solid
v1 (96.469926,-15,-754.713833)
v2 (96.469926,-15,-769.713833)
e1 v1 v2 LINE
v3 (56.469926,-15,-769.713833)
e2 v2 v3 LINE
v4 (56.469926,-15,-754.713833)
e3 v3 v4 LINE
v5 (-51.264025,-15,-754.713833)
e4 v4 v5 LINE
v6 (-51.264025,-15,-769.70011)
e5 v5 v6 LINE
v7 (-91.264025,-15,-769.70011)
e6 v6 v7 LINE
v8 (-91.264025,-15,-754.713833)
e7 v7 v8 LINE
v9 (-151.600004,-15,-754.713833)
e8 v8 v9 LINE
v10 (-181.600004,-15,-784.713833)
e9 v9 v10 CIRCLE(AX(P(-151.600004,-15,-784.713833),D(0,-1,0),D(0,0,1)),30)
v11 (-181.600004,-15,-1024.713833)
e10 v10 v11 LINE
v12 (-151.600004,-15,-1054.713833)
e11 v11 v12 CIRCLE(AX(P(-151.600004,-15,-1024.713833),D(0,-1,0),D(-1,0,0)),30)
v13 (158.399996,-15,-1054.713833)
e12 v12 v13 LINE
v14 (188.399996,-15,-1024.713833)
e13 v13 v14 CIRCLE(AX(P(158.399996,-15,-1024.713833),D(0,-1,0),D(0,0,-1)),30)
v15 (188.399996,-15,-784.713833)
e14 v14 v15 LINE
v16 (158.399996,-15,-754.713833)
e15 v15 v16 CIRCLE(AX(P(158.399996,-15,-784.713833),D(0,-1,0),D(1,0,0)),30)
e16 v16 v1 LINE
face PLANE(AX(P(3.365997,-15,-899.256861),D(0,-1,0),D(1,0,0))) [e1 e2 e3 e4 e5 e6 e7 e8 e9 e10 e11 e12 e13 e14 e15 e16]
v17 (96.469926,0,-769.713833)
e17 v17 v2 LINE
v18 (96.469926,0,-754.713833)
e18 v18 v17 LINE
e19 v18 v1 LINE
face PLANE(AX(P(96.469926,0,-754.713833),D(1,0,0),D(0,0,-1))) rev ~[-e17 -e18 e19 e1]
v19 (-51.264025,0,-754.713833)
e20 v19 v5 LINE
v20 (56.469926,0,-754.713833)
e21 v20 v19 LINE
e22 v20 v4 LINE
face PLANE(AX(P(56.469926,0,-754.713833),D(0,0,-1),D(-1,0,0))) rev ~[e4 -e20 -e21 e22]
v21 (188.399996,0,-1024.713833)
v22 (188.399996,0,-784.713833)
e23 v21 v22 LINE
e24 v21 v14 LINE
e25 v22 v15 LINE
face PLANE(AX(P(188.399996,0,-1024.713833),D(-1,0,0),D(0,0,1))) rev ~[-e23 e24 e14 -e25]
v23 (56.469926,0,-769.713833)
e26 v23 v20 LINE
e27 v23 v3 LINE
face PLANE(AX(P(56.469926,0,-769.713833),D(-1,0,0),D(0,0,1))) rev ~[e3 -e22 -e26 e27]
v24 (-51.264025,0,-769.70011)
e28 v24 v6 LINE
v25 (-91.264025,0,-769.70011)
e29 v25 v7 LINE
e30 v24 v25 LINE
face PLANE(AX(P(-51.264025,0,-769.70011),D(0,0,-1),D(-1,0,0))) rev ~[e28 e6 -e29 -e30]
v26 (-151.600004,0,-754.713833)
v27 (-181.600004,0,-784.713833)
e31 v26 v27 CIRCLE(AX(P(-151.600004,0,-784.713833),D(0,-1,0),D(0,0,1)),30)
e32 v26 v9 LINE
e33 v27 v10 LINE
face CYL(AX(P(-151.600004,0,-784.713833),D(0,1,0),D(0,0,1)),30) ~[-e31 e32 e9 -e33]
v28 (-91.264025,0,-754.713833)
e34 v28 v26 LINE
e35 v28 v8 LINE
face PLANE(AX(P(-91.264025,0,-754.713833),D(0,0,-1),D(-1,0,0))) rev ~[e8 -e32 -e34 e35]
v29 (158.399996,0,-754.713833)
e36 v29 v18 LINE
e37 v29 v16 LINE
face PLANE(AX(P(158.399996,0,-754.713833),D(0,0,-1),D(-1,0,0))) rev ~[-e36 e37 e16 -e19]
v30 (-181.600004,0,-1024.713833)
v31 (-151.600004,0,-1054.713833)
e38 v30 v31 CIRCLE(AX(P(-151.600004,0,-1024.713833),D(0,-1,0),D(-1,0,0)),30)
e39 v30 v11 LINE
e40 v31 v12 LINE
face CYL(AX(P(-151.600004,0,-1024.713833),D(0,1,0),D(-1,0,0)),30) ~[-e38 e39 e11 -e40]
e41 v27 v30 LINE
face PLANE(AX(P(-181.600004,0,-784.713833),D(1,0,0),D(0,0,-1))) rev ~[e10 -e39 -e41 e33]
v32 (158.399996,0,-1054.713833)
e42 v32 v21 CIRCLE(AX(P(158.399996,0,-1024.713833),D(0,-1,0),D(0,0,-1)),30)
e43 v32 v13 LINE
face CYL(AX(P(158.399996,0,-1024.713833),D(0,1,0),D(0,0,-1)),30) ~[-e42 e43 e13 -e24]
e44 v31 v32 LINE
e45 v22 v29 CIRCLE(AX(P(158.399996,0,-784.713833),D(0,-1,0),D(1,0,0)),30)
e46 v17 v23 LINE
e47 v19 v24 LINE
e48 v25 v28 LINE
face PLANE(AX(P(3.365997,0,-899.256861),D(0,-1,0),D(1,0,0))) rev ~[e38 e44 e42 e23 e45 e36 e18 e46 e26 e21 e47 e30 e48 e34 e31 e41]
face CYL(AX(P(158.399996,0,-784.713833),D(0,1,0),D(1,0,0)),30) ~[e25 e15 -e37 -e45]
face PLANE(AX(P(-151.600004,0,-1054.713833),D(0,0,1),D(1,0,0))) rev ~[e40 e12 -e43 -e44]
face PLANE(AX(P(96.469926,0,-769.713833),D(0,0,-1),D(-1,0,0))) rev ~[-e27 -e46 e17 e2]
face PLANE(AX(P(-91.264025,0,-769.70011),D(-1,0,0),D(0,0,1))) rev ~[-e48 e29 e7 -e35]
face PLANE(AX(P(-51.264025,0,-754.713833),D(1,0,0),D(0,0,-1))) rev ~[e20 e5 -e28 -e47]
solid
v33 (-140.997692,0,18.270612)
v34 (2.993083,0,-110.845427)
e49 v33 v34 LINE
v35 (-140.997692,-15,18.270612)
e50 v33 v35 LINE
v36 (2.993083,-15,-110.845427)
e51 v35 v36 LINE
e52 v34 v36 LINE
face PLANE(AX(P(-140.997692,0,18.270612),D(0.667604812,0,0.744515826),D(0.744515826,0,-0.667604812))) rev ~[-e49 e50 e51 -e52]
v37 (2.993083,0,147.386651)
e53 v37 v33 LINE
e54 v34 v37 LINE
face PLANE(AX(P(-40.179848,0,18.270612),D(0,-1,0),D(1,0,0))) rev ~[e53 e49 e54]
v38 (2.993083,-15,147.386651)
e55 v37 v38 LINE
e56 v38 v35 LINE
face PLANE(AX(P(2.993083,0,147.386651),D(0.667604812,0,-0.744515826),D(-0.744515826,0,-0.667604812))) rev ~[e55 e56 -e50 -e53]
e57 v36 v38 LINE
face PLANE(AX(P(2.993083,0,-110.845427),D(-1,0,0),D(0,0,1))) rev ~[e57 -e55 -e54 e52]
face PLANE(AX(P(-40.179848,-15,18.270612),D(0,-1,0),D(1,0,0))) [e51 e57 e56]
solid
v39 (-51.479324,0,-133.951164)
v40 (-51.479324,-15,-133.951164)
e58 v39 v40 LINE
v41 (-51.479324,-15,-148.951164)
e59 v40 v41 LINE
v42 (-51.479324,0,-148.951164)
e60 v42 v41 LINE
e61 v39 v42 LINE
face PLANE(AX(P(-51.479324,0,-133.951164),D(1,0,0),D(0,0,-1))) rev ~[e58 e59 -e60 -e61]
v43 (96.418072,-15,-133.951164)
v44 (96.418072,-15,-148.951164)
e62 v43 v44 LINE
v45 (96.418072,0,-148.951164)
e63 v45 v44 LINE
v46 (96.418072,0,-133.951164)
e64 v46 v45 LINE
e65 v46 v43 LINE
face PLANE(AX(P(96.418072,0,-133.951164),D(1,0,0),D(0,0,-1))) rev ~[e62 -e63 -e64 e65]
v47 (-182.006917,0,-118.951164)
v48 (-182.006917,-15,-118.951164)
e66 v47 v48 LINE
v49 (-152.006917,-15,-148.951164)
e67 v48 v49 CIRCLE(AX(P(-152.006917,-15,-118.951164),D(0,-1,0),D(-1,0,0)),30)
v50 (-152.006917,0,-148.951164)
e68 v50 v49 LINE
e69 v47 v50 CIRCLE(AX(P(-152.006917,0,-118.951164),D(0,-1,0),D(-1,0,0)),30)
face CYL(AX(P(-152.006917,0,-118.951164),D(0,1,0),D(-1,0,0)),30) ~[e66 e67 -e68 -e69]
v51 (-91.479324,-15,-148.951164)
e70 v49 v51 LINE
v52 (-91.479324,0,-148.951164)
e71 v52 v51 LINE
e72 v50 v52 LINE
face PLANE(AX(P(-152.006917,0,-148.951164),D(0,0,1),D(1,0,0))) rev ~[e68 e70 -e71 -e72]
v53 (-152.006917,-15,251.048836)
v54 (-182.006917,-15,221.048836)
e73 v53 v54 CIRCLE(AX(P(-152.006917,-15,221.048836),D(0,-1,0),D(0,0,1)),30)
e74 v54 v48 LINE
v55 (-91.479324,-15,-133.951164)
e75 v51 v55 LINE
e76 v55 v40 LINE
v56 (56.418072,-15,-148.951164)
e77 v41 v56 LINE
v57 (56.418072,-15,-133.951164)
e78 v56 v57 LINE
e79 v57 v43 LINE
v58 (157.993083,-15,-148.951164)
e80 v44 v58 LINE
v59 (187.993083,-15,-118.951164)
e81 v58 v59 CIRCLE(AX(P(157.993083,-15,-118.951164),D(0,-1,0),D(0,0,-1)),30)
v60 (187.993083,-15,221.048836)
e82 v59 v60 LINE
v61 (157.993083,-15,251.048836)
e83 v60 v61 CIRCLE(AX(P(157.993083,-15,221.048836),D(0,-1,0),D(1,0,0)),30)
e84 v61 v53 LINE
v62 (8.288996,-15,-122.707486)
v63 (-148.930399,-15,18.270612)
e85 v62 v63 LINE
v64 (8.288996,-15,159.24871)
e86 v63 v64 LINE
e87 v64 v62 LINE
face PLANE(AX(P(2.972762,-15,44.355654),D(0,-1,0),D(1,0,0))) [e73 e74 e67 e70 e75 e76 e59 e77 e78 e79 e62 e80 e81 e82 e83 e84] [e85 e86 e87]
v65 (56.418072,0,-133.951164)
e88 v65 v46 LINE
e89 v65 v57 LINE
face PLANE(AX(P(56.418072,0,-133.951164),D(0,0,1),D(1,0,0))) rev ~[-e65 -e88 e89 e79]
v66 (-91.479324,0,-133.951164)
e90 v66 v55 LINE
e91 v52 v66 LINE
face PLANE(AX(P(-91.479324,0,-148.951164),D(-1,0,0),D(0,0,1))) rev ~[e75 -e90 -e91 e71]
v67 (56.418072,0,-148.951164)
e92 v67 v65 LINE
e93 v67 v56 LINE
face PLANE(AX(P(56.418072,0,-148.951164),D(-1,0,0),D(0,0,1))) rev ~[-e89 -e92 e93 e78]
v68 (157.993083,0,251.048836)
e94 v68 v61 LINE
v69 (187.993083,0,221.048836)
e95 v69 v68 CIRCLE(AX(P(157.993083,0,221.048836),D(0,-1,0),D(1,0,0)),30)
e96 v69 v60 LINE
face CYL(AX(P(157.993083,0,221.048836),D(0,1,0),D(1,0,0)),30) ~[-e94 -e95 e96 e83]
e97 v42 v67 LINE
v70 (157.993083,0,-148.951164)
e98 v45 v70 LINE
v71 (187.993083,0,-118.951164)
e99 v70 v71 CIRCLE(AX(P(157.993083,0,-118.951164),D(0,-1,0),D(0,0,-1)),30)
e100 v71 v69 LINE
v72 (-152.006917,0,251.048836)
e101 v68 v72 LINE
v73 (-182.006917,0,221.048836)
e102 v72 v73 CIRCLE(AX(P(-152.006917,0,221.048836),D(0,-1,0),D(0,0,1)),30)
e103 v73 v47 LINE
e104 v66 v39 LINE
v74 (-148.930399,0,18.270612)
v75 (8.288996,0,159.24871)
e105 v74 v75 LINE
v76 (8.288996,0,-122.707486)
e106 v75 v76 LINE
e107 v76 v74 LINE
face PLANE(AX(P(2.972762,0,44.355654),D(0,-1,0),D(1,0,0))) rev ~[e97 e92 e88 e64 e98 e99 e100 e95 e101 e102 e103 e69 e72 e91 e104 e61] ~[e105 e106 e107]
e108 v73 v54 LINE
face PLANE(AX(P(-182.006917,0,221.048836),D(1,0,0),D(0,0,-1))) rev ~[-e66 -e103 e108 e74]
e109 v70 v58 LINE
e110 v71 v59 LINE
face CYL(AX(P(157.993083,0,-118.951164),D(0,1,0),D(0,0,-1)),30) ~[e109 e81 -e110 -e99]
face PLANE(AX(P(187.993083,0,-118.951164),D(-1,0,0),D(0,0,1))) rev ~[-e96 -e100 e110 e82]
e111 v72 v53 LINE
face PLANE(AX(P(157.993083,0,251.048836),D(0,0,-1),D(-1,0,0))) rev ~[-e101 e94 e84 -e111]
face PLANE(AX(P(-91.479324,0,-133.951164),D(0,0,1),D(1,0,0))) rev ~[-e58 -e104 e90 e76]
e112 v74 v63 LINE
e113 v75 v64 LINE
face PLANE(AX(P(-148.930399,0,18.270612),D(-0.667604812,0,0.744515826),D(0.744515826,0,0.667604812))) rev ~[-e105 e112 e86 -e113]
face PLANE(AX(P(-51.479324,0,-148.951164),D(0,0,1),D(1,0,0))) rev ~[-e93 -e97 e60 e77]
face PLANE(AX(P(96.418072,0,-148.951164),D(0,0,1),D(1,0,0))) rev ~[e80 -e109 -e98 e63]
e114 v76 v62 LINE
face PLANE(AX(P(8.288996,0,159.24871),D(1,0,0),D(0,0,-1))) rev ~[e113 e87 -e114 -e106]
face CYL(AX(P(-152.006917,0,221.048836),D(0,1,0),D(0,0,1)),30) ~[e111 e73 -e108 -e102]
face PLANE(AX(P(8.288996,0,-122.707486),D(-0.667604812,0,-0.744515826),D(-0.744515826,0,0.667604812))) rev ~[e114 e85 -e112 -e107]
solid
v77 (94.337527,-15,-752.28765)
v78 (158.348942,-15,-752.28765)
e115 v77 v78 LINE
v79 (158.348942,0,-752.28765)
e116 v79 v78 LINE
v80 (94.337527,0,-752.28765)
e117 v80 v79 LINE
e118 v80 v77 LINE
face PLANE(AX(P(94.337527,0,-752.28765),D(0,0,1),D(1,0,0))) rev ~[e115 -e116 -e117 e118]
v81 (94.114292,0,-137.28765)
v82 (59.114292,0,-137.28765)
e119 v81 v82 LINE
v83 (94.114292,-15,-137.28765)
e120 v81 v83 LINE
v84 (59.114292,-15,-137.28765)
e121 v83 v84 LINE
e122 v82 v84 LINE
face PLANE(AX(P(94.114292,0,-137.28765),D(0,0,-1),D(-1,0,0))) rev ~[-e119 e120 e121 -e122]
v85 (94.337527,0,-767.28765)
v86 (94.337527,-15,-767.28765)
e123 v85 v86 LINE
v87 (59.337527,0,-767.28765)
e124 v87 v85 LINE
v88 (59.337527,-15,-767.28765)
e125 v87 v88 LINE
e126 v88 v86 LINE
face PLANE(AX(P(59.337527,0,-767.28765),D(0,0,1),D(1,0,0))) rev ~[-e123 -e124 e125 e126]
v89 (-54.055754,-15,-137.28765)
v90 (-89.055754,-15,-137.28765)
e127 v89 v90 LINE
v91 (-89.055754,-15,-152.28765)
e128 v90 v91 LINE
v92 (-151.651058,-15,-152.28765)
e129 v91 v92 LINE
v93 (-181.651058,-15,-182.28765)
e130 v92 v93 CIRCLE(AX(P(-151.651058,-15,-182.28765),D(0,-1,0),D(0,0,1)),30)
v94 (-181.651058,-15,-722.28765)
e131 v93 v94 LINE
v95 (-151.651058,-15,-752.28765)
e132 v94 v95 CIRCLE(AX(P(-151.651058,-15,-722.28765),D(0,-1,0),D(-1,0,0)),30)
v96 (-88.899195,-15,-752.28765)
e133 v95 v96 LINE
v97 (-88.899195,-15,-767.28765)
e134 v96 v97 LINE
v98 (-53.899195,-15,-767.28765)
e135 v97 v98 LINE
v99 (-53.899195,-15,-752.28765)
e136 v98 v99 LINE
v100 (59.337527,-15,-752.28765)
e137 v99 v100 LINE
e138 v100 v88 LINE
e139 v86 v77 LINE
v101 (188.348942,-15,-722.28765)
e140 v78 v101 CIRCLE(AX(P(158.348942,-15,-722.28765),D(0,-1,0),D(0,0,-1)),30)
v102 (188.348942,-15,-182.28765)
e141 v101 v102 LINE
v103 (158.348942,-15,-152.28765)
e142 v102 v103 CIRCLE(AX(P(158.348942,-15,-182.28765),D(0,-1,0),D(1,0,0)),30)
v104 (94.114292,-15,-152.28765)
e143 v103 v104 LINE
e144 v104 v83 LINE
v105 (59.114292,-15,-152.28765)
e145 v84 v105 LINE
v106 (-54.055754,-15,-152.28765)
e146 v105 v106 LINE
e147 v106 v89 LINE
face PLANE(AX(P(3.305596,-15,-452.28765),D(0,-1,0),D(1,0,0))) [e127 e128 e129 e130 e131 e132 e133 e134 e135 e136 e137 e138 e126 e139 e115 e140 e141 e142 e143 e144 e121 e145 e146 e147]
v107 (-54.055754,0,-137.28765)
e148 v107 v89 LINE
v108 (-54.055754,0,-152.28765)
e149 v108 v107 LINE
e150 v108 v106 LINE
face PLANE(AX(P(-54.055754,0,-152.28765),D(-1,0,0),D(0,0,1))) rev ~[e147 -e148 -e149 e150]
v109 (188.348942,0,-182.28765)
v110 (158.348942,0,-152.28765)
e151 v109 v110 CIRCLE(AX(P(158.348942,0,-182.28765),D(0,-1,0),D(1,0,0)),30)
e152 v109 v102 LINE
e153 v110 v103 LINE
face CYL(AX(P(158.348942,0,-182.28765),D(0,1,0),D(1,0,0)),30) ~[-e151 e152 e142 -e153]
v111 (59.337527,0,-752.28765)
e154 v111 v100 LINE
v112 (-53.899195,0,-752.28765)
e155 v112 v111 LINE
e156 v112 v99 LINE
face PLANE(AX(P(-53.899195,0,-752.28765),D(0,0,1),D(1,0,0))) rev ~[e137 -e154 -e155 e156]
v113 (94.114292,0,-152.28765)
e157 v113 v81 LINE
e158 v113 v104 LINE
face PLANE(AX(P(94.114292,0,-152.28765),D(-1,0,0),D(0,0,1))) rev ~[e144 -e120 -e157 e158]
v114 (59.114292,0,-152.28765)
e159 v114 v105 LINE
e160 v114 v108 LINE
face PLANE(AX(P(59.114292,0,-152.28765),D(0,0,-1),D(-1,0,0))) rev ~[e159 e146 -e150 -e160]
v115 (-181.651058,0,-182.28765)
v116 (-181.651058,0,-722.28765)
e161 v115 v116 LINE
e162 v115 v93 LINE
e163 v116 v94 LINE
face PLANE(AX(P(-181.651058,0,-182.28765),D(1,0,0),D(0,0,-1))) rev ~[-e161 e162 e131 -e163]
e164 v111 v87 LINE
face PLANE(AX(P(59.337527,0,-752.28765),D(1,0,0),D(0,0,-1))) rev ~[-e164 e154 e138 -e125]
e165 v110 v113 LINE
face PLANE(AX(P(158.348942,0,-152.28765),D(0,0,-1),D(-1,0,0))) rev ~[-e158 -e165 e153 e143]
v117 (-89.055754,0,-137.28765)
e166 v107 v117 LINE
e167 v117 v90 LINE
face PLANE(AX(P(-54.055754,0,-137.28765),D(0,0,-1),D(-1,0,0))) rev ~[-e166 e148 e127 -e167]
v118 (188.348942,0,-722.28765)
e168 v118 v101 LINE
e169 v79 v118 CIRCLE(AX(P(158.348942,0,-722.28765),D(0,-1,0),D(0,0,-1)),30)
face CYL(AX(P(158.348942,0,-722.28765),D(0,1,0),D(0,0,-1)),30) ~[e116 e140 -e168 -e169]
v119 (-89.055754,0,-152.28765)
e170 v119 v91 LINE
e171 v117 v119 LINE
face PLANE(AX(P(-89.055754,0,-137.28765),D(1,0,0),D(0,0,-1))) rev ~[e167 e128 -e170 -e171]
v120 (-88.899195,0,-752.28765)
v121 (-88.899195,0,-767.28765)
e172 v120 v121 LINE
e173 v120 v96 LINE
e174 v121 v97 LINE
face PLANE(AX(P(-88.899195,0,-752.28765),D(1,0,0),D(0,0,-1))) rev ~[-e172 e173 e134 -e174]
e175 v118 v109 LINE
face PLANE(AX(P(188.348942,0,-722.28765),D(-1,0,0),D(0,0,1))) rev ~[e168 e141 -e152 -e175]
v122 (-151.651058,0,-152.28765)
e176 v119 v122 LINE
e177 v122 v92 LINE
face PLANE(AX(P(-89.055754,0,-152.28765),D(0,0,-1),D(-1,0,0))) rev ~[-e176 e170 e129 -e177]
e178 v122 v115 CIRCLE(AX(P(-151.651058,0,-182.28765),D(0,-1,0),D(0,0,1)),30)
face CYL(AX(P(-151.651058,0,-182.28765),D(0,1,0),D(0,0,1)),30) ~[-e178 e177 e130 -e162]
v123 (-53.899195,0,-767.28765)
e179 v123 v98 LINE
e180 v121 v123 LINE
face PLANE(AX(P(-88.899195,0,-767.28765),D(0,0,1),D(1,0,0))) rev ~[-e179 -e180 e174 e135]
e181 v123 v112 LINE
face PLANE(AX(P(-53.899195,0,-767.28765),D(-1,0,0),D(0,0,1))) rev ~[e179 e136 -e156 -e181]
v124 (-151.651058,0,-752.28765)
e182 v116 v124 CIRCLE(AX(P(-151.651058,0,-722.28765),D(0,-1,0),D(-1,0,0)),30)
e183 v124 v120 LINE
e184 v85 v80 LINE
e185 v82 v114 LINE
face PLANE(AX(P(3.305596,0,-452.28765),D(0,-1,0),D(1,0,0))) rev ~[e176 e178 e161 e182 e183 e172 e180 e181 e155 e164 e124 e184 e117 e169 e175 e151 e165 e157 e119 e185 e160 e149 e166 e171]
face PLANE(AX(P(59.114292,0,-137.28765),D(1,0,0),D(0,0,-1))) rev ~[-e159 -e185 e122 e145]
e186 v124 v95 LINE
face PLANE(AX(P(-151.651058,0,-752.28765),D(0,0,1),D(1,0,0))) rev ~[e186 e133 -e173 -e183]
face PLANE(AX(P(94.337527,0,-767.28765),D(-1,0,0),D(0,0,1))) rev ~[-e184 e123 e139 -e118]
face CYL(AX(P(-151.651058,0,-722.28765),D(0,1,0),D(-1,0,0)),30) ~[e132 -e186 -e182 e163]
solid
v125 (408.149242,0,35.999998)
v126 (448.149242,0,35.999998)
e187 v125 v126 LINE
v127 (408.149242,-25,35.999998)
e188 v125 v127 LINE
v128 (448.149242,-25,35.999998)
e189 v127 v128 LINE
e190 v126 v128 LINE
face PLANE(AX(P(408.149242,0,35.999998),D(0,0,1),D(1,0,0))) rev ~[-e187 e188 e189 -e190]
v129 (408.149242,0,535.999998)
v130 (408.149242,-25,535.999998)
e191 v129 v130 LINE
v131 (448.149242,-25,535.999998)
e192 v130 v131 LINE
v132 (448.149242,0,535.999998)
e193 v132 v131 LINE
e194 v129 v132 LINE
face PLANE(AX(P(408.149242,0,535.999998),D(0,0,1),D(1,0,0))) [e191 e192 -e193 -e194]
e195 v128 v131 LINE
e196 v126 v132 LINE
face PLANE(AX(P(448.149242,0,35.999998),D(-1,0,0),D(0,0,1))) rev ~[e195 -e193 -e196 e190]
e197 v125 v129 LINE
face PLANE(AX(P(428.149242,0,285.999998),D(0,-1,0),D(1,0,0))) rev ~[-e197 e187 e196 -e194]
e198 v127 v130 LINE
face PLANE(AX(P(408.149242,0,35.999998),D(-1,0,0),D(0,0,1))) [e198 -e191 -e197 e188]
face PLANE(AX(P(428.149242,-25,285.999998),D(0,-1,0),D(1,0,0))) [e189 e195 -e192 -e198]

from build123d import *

# Parameters (mm, degrees)
F1_DEPTH = 15
F2_DEPTH = 15
F0_W     = 40
F0_H     = 500
F3_DEPTH = 25


# Not quite as in the source:
# - a feature names something its author has since deleted; it is built from what else it names


with BuildPart() as f1:
    # F0 (on Front) → F1 (new body)
    with BuildSketch(Plane.XZ):
        with BuildLine():
            Line((157.9930828999, 251.0488363948), (-152.0069171001, 251.0488363948))
            ThreePointArc((-152.0069171001, 251.0488363948), (-173.2201205357, 242.2620398304), (-182.0069171001, 221.0488363948))
            Line((-182.0069171001, 221.0488363948), (-182.0069171001, -118.9511636052))
            ThreePointArc((-182.0069171001, -118.9511636052), (-173.2201205357, -140.1643670408), (-152.0069171001, -148.9511636052))
            Line((-152.0069171001, -148.9511636052), (-91.4793238044, -148.9511636052))
            Line((-91.4793238044, -148.9511636052), (-91.4793238044, -133.9511636052))
            Line((-91.4793238044, -133.9511636052), (-51.4793238044, -133.9511636052))
            Line((-51.4793238044, -133.9511636052), (-51.4793238044, -148.9511636052))
            Line((-51.4793238044, -148.9511636052), (56.4180724323, -148.9511636052))
            Line((56.4180724323, -148.9511636052), (56.4180724323, -133.9511636052))
            Line((56.4180724323, -133.9511636052), (96.4180724323, -133.9511636052))
            Line((96.4180724323, -133.9511636052), (96.4180724323, -148.9511636052))
            Line((96.4180724323, -148.9511636052), (157.9930828999, -148.9511636052))
            ThreePointArc((157.9930828999, -148.9511636052), (179.2062863355, -140.1643670408), (187.9930828999, -118.9511636052))
            Line((187.9930828999, -118.9511636052), (187.9930828999, 221.0488363948))
            ThreePointArc((187.9930828999, 221.0488363948), (179.2062863355, 242.2620398304), (157.9930828999, 251.0488363948))
        make_face()
        Polygon((8.2889962941, 159.2487096786), (8.2889962941, -122.7074861526), (-148.9303992233, 18.270611763), align=None, mode=Mode.SUBTRACT)
    extrude(amount=F1_DEPTH)


with BuildPart() as f2:
    # F0 (on Front) → F2 (new body)
    with BuildSketch(Plane.XZ):
        with BuildLine():
            Line((-89.0557542443, -152.287649894), (-151.6510576755, -152.287649894))
            ThreePointArc((-151.6510576755, -152.287649894), (-172.8642611111, -161.0744464584), (-181.6510576755, -182.287649894))
            Line((-181.6510576755, -182.287649894), (-181.6510576755, -722.287649894))
            ThreePointArc((-181.6510576755, -722.287649894), (-172.8642611111, -743.5008533296), (-151.6510576755, -752.287649894))
            Line((-151.6510576755, -752.287649894), (-88.8991951942, -752.287649894))
            Line((-88.8991951942, -752.287649894), (-88.8991951942, -767.287649894))
            Line((-88.8991951942, -767.287649894), (-53.8991951942, -767.287649894))
            Line((-53.8991951942, -767.287649894), (-53.8991951942, -752.287649894))
            Line((-53.8991951942, -752.287649894), (59.3375265598, -752.287649894))
            Line((59.3375265598, -752.287649894), (59.3375265598, -767.287649894))
            Line((59.3375265598, -767.287649894), (94.3375265598, -767.287649894))
            Line((94.3375265598, -767.287649894), (94.3375265598, -752.287649894))
            Line((94.3375265598, -752.287649894), (158.3489423245, -752.287649894))
            ThreePointArc((158.3489423245, -752.287649894), (179.5621457601, -743.5008533296), (188.3489423245, -722.287649894))
            Line((188.3489423245, -722.287649894), (188.3489423245, -182.287649894))
            ThreePointArc((188.3489423245, -182.287649894), (179.5621457601, -161.0744464584), (158.3489423245, -152.287649894))
            Line((158.3489423245, -152.287649894), (94.114292264, -152.287649894))
            Line((94.114292264, -152.287649894), (94.114292264, -137.287649894))
            Line((94.114292264, -137.287649894), (59.114292264, -137.287649894))
            Line((59.114292264, -137.287649894), (59.114292264, -152.287649894))
            Line((59.114292264, -152.287649894), (-54.0557542443, -152.287649894))
            Line((-54.0557542443, -152.287649894), (-54.0557542443, -137.287649894))
            Line((-54.0557542443, -137.287649894), (-89.0557542443, -137.287649894))
            Line((-89.0557542443, -137.287649894), (-89.0557542443, -152.287649894))
        make_face()
    extrude(amount=F2_DEPTH)


with BuildPart() as f2b:
    # F0 (on Front) → F2, piece 2 (new body)
    with BuildSketch(Plane.XZ):
        with BuildLine():
            Line((-91.2640253641, -754.7138333321), (-151.6000044346, -754.7138333321))
            ThreePointArc((-151.6000044346, -754.7138333321), (-172.8132078702, -763.5006298965), (-181.6000044346, -784.7138333321))
            Line((-181.6000044346, -784.7138333321), (-181.6000044346, -1024.7138333321))
            ThreePointArc((-181.6000044346, -1024.7138333321), (-172.8132078702, -1045.9270367677), (-151.6000044346, -1054.7138333321))
            Line((-151.6000044346, -1054.7138333321), (-91.3764173724, -1054.7138333321))
            Line((-91.3764173724, -1054.7138333321), (56.5209788643, -1054.7138333321))
            Line((56.5209788643, -1054.7138333321), (158.3999955654, -1054.7138333321))
            ThreePointArc((158.3999955654, -1054.7138333321), (179.613199001, -1045.9270367677), (188.3999955654, -1024.7138333321))
            Line((188.3999955654, -1024.7138333321), (188.3999955654, -784.7138333321))
            ThreePointArc((188.3999955654, -784.7138333321), (179.613199001, -763.5006298965), (158.3999955654, -754.7138333321))
            Line((158.3999955654, -754.7138333321), (96.4699256234, -754.7138333321))
            Line((96.4699256234, -754.7138333321), (96.4699256234, -769.7138333321))
            Line((96.4699256234, -769.7138333321), (56.4699256234, -769.7138333321))
            Line((56.4699256234, -769.7138333321), (56.4699256234, -754.7138333321))
            Line((56.4699256234, -754.7138333321), (-51.2640253641, -754.7138333321))
            Line((-51.2640253641, -754.7138333321), (-51.2640253641, -769.7001099586))
            Line((-51.2640253641, -769.7001099586), (-91.2640253641, -769.7001099586))
            Line((-91.2640253641, -769.7001099586), (-91.2640253641, -754.7138333321))
        make_face()
    extrude(amount=F2_DEPTH)


with BuildPart() as f2c:
    # F0 (on Front) → F2, piece 3 (new body)
    with BuildSketch(Plane.XZ):
        Polygon((2.9930828999, -110.8454271421), (2.9930828999, 147.3866506681), (-140.9976921807, 18.270611763), align=None)
    extrude(amount=F2_DEPTH)


with BuildPart() as f3:
    # F0 (on Front) → F3 (new body)
    with BuildSketch(Plane.XZ):
        with Locations((428.1492424011, 285.9999984503)):
            Rectangle(F0_W, F0_H)
    extrude(amount=F3_DEPTH)


solid = Compound([f1.part, f2.part, f2b.part, f2c.part, f3.part])
